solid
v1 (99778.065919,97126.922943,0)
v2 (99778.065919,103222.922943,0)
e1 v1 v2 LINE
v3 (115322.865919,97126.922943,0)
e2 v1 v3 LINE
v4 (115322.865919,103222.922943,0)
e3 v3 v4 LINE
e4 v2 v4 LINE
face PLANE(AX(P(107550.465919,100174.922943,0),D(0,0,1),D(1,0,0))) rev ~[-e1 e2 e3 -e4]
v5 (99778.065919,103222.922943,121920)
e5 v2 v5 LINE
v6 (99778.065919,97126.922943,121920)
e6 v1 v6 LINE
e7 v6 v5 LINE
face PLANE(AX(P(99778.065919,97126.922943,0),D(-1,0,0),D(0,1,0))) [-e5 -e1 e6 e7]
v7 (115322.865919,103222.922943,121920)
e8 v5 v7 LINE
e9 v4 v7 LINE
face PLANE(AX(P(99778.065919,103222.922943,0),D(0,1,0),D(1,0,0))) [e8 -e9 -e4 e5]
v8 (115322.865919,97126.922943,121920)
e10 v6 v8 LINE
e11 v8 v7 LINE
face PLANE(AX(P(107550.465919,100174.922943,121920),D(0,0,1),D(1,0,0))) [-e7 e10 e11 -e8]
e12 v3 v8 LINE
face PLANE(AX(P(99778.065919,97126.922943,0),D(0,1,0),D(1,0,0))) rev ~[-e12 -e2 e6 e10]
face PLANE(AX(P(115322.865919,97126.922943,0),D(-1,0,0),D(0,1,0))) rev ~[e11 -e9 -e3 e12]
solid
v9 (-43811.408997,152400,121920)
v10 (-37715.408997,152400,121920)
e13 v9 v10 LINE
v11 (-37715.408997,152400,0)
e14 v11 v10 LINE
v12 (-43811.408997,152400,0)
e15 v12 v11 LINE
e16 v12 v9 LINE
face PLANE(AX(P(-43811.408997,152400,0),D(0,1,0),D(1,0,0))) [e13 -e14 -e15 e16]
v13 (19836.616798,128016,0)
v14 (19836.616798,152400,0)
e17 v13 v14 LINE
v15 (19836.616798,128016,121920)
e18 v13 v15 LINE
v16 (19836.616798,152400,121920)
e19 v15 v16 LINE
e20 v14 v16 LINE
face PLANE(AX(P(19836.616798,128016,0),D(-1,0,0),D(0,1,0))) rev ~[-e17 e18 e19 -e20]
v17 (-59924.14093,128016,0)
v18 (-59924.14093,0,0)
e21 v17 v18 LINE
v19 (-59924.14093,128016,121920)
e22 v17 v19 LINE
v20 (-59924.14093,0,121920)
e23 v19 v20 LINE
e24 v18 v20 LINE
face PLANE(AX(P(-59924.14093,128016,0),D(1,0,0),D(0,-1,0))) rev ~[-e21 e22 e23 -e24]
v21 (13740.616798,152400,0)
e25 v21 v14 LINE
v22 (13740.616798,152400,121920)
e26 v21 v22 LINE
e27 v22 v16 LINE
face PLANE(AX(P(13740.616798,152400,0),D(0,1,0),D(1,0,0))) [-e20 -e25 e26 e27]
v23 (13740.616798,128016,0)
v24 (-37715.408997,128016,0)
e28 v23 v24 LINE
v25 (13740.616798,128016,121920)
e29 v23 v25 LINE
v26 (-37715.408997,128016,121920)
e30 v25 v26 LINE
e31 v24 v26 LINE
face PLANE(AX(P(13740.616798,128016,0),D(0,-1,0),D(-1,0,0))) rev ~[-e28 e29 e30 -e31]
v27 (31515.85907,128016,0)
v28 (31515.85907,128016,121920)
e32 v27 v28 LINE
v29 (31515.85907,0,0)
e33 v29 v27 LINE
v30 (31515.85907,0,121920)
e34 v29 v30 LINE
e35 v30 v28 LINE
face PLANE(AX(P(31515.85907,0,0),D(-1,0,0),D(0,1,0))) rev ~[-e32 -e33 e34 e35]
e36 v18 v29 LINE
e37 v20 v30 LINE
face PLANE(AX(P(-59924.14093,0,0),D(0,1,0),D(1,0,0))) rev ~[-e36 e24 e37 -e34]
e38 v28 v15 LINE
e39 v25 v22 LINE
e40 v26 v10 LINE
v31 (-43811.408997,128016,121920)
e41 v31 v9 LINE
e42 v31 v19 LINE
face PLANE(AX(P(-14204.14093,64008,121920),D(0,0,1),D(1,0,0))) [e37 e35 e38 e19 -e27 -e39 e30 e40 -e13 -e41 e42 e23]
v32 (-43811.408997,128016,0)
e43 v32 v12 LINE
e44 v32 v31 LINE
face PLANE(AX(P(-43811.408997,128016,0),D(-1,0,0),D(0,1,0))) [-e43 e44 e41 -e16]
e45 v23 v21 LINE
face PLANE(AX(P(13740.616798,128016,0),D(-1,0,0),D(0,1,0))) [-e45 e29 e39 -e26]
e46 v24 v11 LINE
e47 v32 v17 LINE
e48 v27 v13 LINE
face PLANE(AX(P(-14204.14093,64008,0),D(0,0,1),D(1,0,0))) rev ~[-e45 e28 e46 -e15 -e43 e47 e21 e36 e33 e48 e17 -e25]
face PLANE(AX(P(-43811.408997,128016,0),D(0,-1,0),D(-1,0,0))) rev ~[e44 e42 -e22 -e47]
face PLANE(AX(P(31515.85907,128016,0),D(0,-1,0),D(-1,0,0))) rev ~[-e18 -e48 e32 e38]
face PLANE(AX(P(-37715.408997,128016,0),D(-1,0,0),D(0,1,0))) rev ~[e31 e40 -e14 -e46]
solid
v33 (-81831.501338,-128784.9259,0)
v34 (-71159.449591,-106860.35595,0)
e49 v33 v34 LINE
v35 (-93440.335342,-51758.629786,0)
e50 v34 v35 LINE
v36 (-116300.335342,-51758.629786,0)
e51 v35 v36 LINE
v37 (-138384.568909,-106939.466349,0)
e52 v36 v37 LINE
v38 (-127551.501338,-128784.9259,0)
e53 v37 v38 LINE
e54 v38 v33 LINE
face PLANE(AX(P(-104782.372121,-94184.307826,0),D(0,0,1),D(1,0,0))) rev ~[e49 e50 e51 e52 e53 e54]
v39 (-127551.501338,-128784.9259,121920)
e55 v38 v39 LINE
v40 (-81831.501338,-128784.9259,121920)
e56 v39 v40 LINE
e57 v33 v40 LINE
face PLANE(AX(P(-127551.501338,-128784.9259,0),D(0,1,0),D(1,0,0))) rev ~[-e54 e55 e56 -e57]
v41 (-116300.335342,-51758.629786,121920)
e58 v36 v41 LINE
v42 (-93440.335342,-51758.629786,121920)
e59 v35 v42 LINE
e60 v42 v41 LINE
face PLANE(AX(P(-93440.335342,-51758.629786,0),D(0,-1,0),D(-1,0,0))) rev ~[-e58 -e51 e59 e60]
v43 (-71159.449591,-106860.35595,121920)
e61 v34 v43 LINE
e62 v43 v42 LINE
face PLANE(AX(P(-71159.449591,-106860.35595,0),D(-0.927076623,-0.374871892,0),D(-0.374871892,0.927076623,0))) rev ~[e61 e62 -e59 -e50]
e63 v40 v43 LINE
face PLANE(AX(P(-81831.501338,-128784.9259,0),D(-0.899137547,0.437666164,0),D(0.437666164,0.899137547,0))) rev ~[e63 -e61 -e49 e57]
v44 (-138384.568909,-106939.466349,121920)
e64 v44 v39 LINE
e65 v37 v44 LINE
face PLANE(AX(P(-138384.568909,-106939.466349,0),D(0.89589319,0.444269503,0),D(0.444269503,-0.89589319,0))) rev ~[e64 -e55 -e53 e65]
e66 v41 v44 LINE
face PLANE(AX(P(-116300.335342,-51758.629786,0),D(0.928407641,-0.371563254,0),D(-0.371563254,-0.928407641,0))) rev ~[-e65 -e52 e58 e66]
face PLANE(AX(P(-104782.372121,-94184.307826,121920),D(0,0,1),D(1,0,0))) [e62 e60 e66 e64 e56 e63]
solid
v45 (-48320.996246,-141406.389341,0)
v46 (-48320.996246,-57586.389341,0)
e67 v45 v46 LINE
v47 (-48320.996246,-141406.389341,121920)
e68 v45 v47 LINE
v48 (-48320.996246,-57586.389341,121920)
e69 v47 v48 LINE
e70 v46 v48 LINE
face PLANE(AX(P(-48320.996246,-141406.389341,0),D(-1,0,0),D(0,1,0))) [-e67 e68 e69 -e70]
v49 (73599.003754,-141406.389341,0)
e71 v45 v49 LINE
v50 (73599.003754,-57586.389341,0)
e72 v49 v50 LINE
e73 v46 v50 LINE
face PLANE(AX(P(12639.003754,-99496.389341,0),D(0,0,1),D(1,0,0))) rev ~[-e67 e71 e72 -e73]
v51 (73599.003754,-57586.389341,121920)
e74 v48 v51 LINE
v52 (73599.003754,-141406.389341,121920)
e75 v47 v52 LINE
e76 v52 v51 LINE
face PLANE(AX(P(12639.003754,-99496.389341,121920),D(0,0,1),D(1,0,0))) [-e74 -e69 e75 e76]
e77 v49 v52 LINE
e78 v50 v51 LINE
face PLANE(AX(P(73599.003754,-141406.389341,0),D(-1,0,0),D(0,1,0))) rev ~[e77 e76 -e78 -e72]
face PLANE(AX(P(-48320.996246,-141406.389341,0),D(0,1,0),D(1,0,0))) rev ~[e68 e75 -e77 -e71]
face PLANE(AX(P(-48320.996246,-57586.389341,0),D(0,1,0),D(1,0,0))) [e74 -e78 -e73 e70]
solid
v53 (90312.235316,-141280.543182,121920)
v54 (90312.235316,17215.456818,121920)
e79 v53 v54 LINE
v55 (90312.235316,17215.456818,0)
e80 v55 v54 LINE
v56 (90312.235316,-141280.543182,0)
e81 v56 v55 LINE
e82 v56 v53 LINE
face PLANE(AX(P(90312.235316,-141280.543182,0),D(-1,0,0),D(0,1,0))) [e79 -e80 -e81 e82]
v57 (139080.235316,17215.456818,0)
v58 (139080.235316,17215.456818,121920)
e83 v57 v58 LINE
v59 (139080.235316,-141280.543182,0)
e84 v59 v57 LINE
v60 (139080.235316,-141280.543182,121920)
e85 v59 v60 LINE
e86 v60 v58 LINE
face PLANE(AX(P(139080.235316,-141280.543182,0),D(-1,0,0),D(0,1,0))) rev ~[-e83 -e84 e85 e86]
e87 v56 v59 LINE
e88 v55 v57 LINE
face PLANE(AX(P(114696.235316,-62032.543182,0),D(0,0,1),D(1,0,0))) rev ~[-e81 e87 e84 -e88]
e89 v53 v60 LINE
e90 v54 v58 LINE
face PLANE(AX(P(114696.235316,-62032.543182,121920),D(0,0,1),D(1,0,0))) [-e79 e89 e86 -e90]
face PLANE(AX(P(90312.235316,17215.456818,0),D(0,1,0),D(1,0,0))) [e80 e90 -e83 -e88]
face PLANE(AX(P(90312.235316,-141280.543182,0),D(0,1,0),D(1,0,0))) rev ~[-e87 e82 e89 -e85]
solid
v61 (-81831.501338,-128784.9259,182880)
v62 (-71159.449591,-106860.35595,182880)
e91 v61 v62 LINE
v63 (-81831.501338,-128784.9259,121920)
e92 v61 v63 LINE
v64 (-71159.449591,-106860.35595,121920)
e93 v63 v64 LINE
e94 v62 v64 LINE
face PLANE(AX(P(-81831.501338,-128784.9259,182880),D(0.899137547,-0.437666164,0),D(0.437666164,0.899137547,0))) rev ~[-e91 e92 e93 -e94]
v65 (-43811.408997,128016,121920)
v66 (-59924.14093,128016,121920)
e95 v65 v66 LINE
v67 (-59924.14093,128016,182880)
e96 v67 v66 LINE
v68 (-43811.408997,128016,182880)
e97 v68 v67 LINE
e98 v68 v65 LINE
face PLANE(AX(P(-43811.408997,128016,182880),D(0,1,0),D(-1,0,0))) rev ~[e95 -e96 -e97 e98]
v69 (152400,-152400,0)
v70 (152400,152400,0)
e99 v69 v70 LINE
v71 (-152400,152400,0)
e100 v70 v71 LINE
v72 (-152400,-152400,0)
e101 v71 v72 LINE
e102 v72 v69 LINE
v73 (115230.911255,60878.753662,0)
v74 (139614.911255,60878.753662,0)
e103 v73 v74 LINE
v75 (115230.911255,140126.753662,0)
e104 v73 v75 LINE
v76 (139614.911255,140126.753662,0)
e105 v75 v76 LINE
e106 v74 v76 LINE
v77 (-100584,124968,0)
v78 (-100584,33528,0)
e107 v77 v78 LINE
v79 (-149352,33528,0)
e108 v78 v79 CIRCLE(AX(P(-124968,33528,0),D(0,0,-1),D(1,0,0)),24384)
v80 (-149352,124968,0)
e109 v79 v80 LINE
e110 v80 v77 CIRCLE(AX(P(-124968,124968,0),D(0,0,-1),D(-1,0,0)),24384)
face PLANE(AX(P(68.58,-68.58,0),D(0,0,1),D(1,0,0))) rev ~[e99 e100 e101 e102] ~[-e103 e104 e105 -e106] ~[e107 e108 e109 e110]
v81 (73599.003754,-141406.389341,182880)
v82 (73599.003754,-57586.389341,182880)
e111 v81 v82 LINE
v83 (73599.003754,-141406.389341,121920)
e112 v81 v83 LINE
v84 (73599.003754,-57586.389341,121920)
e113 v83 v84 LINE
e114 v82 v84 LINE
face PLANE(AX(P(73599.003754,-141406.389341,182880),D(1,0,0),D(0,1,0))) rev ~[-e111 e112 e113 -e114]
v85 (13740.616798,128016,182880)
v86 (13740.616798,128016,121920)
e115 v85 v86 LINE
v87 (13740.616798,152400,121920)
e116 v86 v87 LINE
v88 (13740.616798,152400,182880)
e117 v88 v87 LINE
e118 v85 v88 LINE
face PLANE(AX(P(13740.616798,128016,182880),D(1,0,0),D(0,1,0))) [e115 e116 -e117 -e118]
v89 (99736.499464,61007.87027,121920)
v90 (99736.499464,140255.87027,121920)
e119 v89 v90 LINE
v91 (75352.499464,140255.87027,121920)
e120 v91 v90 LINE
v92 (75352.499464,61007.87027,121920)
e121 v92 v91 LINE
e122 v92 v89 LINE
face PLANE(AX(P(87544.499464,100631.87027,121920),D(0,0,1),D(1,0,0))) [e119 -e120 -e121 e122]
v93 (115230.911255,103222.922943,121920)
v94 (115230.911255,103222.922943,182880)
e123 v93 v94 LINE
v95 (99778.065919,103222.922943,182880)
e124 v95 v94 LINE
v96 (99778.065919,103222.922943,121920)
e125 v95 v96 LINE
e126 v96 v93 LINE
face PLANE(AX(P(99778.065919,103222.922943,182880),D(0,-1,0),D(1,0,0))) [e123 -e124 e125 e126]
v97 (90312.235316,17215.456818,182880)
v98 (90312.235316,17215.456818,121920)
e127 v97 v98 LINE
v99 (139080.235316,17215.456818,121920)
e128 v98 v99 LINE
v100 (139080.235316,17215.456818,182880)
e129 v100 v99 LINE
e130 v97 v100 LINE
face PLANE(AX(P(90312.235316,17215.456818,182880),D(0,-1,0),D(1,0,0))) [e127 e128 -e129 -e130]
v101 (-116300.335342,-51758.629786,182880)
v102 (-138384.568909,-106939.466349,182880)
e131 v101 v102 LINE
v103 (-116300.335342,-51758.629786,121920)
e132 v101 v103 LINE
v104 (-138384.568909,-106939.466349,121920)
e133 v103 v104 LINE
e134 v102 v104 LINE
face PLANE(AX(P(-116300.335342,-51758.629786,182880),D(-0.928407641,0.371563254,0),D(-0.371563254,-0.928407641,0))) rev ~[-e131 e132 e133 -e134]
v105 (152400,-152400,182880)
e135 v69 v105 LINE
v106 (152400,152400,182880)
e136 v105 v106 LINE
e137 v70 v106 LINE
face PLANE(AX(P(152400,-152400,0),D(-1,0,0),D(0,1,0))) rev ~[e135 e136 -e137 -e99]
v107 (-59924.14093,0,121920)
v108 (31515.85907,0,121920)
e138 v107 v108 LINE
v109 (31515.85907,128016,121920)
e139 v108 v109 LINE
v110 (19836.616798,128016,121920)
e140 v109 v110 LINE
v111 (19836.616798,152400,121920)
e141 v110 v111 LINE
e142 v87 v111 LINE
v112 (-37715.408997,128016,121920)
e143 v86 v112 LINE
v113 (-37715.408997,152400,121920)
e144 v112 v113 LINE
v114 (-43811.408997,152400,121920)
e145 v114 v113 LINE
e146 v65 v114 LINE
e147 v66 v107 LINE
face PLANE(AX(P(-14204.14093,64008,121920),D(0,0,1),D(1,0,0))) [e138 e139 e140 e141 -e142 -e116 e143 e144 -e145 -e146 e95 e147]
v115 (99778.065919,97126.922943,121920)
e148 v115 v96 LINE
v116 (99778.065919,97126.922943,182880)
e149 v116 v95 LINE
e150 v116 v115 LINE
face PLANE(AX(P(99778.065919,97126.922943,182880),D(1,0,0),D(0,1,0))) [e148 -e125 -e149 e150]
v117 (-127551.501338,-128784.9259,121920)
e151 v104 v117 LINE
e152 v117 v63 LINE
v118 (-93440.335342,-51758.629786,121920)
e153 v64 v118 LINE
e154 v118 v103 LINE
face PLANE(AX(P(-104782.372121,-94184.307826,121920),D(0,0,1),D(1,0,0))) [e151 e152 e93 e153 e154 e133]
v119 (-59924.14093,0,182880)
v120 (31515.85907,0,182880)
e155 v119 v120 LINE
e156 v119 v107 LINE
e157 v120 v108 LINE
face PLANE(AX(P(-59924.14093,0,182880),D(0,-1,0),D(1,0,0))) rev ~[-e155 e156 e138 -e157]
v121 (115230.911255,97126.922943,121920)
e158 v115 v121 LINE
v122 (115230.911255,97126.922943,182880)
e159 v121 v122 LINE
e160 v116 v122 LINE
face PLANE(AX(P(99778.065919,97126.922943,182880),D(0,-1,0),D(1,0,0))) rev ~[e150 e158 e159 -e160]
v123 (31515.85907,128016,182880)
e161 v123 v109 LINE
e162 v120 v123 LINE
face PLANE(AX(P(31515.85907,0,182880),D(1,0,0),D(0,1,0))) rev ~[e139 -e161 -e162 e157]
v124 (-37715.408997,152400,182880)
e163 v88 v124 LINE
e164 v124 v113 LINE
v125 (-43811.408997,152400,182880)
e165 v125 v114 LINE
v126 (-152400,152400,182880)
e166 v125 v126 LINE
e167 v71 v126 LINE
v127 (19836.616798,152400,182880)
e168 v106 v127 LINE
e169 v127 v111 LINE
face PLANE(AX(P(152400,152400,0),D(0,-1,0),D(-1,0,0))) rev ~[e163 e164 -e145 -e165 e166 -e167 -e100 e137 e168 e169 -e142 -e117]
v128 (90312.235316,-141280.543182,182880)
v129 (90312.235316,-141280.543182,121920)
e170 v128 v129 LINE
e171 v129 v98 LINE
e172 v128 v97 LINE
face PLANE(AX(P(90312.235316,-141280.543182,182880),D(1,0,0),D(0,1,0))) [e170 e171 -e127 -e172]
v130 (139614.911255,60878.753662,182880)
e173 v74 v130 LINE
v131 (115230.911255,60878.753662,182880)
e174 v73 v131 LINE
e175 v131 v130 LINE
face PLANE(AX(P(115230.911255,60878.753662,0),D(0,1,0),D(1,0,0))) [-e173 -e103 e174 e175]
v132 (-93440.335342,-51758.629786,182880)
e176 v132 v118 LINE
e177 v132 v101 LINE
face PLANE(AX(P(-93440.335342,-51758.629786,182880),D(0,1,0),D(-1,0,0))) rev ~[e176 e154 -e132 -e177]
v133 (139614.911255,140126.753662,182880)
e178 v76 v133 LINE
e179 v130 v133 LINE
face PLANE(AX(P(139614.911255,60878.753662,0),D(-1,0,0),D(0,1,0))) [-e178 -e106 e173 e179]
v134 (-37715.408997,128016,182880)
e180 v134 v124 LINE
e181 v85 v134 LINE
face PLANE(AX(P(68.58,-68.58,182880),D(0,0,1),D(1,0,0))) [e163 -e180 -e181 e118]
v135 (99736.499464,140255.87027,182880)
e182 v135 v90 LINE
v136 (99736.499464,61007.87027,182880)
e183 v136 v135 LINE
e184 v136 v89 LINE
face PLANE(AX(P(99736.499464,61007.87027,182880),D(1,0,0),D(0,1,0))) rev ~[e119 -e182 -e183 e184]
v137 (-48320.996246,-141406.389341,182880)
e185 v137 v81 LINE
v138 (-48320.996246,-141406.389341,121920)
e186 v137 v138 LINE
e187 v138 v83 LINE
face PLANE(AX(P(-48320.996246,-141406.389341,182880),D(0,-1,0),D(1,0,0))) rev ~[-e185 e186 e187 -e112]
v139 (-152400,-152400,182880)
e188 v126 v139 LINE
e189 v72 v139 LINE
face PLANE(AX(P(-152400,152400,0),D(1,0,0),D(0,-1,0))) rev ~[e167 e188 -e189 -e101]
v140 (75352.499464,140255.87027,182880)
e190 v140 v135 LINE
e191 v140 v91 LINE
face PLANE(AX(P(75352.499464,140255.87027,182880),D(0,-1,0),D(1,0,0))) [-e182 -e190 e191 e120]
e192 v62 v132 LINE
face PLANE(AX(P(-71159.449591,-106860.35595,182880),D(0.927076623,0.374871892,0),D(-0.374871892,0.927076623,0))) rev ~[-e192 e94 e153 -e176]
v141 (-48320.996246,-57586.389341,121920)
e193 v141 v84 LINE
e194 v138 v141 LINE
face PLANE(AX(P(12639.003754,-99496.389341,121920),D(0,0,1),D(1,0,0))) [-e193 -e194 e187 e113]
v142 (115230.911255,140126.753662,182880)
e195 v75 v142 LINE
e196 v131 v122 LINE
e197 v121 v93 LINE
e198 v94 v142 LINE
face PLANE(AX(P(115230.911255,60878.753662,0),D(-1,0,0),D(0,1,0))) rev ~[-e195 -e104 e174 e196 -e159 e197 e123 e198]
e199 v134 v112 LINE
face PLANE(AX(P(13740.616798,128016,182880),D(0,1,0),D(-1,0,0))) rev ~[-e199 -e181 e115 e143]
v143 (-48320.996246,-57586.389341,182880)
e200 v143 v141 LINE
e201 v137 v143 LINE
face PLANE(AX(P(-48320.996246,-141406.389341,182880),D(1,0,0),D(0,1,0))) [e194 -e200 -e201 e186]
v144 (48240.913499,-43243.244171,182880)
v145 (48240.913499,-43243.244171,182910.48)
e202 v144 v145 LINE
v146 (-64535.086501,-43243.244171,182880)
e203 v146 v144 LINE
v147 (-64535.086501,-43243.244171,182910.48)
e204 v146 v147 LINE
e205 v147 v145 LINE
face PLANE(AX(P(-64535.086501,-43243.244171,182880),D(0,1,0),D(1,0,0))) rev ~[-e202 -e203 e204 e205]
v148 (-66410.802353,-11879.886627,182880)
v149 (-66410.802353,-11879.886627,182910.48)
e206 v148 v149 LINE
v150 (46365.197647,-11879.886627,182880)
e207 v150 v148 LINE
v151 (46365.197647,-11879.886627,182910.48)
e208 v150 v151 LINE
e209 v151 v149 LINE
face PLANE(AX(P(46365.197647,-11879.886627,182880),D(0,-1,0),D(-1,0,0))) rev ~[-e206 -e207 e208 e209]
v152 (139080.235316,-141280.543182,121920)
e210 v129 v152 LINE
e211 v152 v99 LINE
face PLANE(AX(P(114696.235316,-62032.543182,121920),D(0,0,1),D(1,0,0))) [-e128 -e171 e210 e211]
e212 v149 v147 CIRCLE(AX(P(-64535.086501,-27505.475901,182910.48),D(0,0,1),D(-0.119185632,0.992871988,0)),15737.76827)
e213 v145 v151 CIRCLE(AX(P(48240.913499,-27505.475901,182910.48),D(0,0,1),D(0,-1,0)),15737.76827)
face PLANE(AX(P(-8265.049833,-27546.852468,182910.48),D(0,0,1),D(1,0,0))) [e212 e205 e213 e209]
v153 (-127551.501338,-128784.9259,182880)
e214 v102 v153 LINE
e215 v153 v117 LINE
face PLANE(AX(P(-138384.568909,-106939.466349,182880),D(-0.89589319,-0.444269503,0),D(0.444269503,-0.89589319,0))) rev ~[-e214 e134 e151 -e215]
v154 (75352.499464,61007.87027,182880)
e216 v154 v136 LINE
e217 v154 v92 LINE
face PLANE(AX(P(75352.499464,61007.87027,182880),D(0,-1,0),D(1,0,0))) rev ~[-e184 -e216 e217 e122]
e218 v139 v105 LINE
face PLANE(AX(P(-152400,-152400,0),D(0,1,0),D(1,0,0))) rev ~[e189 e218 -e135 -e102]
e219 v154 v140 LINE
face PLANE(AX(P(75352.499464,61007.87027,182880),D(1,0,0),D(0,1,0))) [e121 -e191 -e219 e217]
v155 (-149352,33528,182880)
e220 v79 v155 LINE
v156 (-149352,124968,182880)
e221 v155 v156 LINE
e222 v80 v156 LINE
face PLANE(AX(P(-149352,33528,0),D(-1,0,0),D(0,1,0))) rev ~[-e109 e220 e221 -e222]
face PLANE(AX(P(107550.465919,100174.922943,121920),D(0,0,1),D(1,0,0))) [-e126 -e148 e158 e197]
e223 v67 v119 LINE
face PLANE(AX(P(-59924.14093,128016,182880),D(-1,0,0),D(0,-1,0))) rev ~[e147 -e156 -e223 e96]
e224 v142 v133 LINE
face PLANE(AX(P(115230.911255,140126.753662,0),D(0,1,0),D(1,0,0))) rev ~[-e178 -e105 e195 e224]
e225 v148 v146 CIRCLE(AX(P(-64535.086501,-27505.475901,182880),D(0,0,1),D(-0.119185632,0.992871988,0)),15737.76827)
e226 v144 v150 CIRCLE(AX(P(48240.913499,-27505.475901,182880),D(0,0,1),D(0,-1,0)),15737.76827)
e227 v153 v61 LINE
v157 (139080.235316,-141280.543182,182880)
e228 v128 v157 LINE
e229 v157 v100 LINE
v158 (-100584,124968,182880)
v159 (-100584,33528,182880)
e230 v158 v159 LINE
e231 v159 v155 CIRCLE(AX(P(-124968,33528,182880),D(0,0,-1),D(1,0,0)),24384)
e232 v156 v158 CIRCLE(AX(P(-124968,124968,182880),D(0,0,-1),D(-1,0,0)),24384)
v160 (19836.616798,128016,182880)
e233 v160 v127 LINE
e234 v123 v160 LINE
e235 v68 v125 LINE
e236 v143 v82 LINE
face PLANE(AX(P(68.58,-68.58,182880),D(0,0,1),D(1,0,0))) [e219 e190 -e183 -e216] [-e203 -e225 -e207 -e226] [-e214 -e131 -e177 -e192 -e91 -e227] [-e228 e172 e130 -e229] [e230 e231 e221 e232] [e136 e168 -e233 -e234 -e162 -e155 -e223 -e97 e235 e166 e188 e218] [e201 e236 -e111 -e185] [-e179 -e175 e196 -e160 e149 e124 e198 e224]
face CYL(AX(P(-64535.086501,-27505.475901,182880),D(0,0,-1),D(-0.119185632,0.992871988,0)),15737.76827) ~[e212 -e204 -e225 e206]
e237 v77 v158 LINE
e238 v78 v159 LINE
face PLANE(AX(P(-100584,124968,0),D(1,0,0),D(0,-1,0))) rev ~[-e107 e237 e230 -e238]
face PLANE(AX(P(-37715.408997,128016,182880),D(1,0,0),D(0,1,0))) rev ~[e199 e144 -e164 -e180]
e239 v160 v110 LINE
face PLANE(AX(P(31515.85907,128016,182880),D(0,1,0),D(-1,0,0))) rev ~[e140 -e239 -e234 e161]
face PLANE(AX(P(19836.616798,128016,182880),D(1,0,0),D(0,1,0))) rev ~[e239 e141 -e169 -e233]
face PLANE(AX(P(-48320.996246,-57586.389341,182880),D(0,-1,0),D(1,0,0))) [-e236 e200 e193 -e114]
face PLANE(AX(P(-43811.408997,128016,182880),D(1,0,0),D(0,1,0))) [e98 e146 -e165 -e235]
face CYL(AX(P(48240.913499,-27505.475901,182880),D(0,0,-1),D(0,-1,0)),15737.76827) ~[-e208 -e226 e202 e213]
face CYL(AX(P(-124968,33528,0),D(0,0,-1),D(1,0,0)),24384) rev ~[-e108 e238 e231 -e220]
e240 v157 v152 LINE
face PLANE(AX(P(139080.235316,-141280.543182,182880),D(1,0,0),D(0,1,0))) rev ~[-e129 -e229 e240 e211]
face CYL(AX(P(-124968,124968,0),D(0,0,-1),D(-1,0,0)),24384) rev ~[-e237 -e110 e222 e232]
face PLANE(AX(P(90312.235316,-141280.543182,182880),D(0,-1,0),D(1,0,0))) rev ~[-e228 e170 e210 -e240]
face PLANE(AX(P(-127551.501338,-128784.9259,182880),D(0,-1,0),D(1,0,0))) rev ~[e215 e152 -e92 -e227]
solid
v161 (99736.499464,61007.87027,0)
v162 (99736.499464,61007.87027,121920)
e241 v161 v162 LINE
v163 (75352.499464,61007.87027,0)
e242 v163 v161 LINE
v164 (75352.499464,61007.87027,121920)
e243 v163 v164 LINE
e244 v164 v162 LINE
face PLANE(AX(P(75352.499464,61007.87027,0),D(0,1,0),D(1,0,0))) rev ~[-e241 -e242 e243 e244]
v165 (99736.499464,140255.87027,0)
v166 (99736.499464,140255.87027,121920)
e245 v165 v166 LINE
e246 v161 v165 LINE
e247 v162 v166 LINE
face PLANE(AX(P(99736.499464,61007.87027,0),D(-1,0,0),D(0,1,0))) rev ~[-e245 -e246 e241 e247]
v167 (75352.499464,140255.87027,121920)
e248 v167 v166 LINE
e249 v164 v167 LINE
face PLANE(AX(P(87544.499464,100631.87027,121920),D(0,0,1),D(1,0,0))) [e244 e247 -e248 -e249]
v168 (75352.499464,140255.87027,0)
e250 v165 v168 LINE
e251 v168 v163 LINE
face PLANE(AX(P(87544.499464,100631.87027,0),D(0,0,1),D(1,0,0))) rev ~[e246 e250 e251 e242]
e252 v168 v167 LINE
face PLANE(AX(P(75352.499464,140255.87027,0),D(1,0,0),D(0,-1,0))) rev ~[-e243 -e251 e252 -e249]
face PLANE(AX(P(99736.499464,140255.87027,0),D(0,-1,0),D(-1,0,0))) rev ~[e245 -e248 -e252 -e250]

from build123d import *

# Parameters (mm, degrees)
F1_W        = 15544.8
F1_H        = 6096
F7_DEPTH    = 182880
F4_W        = 6096
F4_H        = 24384
F0_W        = 24384
F0_H        = 79248
F0_W_2      = 3048
F0_H_2      = 27432
F5_W        = 121920
F5_H        = 83820
F3_W        = 48768.0000000001
F3_H        = 158496
F8_DEPTH    = 60960
F7_FACE_W   = 15544.8
F7_FACE_H   = 6096
F7_FACE_W_2 = 24384
F7_FACE_H_2 = 79248
F7_FACE_W_3 = 48768.0000000001
F7_FACE_H_3 = 158496
F7_FACE_W_4 = 121920
F7_FACE_H_4 = 83820
F9_DEPTH    = 60960
F17_DEPTH   = 30.48


# Not quite as in the source:
# - the program builds the solid bodies; features that only make, move or delete a surface that nothing else refers to are left out


with BuildPart() as f7:
    # F1 (on face) → F7 (new body)
    with BuildSketch(Plane.XY):
        with Locations((107550.465918614, 100174.9229431152)):
            Rectangle(F1_W, F1_H)
    extrude(amount=F7_DEPTH)


with BuildPart() as f7b:
    # F6 (on face) → F7, piece 2 (new body)
    with BuildSketch(Plane.XY):
        Polygon((-138384.5689090631, -106939.4663491444), (-127551.5013376337, -128784.9259001094), (-81831.5013376337, -128784.9259001094), (-71159.4495909771, -106860.3559495566), (-93440.3353419917, -51758.629786484), (-116300.3353419917, -51758.629786484), align=None)
    extrude(amount=F7_DEPTH)


with BuildPart() as f7c:
    # F4 (on face) → F7, piece 3 (new body)
    with BuildSketch(Plane.XY):
        Polygon((-43811.408996582, 128016), (-59924.1409301758, 128016), (-59924.1409301758, 0), (31515.8590698242, 0), (31515.8590698242, 128016), (19836.6167984009, 128016), (13740.6167984009, 128016), (-37715.408996582, 128016), align=None)
        with Locations((-40763.408996582, 140208)):
            Rectangle(F4_W, F4_H)
        with Locations((16788.6167984009, 140208)):
            Rectangle(F4_W, F4_H)
    extrude(amount=F7_DEPTH)


with BuildPart() as f7d:
    # F0 (on Top) → F7, piece 4 (new body)
    with BuildSketch(Plane.XY):
        Polygon((152400, -152400), (152400, 152400), (-149352, 152400), (-149352, 124968), (-152400.0000000001, 124968), (-152400, -152400), align=None)
        with BuildLine():
            Line((-149352, 33528), (-149352, 124968))
            ThreePointArc((-149352, 124968), (-142210.0917524528, 142210.0917524528), (-124968, 149352))
            ThreePointArc((-124968, 149352), (-107725.9082475473, 142210.0917524527), (-100584.0000000001, 124968))
            Line((-100584, 124968), (-100584, 33528))
            ThreePointArc((-100584, 33528), (-124968, 9144), (-149352, 33528))
        make_face(mode=Mode.SUBTRACT)
        with Locations((127422.9112548828, 100502.7536621094)):
            Rectangle(F0_W, F0_H, mode=Mode.SUBTRACT)
        with Locations((-150876, 138684)):
            Rectangle(F0_W_2, F0_H_2)
    extrude(amount=F7_DEPTH)


with BuildPart() as f7e:
    # F5 (on face) → F7, piece 5 (new body)
    with BuildSketch(Plane.XY):
        with Locations((12639.0037536621, -99496.3893408147)):
            Rectangle(F5_W, F5_H)
    extrude(amount=F7_DEPTH)


with BuildPart() as f7f:
    # F2 (on face) → F7, piece 6 (new body)
    with BuildSketch(Plane.XY):
        Polygon((99736.4994638944, 100631.8702697754), (99736.4994638944, 140255.8702697754), (75352.4994638944, 140255.8702697754), (75352.4994638944, 61007.8702697754), (99736.4994638944, 61007.8702697754), (99736.4994638944, 90581.0760098918), align=None)
    extrude(amount=F7_DEPTH)


with BuildPart() as f7g:
    # F3 (on face) → F7, piece 7 (new body)
    with BuildSketch(Plane.XY):
        with Locations((114696.2353164215, -62032.543182373)):
            Rectangle(F3_W, F3_H)
    extrude(amount=F7_DEPTH)


with BuildPart() as f8_tool:
    # F8 (cut): a face of the model
    f8_faces = [f7c.part.faces().sort_by_distance(p)[0] for p in [
        (-14149.2370334306, 65895.306501548, 182880),
    ]]
    extrude(f8_faces, amount=-F8_DEPTH)


with BuildPart() as f7c_1:
    add(f7c.part)

    # F8: cut by f8_tool
    add(f8_tool.part, mode=Mode.SUBTRACT)


with BuildPart() as f7d_1:
    add(f7d.part)

    # F8: cut by f8_tool
    add(f8_tool.part, mode=Mode.SUBTRACT)


with BuildPart() as f9_tool:
    # F7_face (on face) → F9 (new body)
    with BuildSketch(Plane(origin=(-14149.2370334306, 65895.306501548, 182880), x_dir=(1, 0, 0), z_dir=(0, 0, 1))):
        with Locations((121699.7029520446, 34279.6164415673)):
            Rectangle(F7_FACE_W, F7_FACE_H)
        Polygon((-124235.3318756325, -172834.7728506924), (-113402.2643042031, -194680.2324016574), (-67682.2643042031, -194680.2324016574), (-57010.2125575465, -172755.6624511046), (-79291.0983085611, -117653.936288032), (-102151.0983085611, -117653.936288032), align=None)
        with Locations((101693.736497325, 34736.5637682274)):
            Rectangle(F7_FACE_W_2, F7_FACE_H_2)
        with Locations((128845.4723498522, -127927.849683921)):
            Rectangle(F7_FACE_W_3, F7_FACE_H_3)
        with Locations((26788.2407870928, -165391.6958423627)):
            Rectangle(F7_FACE_W_4, F7_FACE_H_4)
    extrude(amount=-F9_DEPTH)


with BuildPart() as f7_1:
    add(f7.part)

    # F9: cut by f9_tool
    add(f9_tool.part, mode=Mode.SUBTRACT)


with BuildPart() as f7b_1:
    add(f7b.part)

    # F9: cut by f9_tool
    add(f9_tool.part, mode=Mode.SUBTRACT)


with BuildPart() as f7d_2:
    add(f7d_1.part)

    # F9: cut by f9_tool
    add(f9_tool.part, mode=Mode.SUBTRACT)

    # F16 (on face) → F17 (join)
    with BuildSketch(Plane.XY.offset(182880)):
        with BuildLine():
            ThreePointArc((-66410.8023529053, -11879.8866271973), (-80244.7849895234, -28445.0095732925), (-64535.0865011215, -43243.2441711426))
            Line((-64535.0865011215, -43243.2441711426), (48240.9134988785, -43243.2441711426))
            ThreePointArc((48240.9134988785, -43243.2441711426), (63950.6119872804, -26565.9422291696), (46365.1976470947, -11879.8866271973))
            Line((46365.1976470947, -11879.8866271973), (-66410.8023529053, -11879.8866271973))
        make_face()
    extrude(amount=F17_DEPTH)


with BuildPart() as f7e_1:
    add(f7e.part)

    # F9: cut by f9_tool
    add(f9_tool.part, mode=Mode.SUBTRACT)


with BuildPart() as f7f_1:
    add(f7f.part)

    # F9: cut by f9_tool
    add(f9_tool.part, mode=Mode.SUBTRACT)


with BuildPart() as f7g_1:
    add(f7g.part)

    # F9: cut by f9_tool
    add(f9_tool.part, mode=Mode.SUBTRACT)


solid = Compound([f7c_1.part, f7_1.part, f7b_1.part, f7d_2.part, f7e_1.part, f7f_1.part, f7g_1.part])
